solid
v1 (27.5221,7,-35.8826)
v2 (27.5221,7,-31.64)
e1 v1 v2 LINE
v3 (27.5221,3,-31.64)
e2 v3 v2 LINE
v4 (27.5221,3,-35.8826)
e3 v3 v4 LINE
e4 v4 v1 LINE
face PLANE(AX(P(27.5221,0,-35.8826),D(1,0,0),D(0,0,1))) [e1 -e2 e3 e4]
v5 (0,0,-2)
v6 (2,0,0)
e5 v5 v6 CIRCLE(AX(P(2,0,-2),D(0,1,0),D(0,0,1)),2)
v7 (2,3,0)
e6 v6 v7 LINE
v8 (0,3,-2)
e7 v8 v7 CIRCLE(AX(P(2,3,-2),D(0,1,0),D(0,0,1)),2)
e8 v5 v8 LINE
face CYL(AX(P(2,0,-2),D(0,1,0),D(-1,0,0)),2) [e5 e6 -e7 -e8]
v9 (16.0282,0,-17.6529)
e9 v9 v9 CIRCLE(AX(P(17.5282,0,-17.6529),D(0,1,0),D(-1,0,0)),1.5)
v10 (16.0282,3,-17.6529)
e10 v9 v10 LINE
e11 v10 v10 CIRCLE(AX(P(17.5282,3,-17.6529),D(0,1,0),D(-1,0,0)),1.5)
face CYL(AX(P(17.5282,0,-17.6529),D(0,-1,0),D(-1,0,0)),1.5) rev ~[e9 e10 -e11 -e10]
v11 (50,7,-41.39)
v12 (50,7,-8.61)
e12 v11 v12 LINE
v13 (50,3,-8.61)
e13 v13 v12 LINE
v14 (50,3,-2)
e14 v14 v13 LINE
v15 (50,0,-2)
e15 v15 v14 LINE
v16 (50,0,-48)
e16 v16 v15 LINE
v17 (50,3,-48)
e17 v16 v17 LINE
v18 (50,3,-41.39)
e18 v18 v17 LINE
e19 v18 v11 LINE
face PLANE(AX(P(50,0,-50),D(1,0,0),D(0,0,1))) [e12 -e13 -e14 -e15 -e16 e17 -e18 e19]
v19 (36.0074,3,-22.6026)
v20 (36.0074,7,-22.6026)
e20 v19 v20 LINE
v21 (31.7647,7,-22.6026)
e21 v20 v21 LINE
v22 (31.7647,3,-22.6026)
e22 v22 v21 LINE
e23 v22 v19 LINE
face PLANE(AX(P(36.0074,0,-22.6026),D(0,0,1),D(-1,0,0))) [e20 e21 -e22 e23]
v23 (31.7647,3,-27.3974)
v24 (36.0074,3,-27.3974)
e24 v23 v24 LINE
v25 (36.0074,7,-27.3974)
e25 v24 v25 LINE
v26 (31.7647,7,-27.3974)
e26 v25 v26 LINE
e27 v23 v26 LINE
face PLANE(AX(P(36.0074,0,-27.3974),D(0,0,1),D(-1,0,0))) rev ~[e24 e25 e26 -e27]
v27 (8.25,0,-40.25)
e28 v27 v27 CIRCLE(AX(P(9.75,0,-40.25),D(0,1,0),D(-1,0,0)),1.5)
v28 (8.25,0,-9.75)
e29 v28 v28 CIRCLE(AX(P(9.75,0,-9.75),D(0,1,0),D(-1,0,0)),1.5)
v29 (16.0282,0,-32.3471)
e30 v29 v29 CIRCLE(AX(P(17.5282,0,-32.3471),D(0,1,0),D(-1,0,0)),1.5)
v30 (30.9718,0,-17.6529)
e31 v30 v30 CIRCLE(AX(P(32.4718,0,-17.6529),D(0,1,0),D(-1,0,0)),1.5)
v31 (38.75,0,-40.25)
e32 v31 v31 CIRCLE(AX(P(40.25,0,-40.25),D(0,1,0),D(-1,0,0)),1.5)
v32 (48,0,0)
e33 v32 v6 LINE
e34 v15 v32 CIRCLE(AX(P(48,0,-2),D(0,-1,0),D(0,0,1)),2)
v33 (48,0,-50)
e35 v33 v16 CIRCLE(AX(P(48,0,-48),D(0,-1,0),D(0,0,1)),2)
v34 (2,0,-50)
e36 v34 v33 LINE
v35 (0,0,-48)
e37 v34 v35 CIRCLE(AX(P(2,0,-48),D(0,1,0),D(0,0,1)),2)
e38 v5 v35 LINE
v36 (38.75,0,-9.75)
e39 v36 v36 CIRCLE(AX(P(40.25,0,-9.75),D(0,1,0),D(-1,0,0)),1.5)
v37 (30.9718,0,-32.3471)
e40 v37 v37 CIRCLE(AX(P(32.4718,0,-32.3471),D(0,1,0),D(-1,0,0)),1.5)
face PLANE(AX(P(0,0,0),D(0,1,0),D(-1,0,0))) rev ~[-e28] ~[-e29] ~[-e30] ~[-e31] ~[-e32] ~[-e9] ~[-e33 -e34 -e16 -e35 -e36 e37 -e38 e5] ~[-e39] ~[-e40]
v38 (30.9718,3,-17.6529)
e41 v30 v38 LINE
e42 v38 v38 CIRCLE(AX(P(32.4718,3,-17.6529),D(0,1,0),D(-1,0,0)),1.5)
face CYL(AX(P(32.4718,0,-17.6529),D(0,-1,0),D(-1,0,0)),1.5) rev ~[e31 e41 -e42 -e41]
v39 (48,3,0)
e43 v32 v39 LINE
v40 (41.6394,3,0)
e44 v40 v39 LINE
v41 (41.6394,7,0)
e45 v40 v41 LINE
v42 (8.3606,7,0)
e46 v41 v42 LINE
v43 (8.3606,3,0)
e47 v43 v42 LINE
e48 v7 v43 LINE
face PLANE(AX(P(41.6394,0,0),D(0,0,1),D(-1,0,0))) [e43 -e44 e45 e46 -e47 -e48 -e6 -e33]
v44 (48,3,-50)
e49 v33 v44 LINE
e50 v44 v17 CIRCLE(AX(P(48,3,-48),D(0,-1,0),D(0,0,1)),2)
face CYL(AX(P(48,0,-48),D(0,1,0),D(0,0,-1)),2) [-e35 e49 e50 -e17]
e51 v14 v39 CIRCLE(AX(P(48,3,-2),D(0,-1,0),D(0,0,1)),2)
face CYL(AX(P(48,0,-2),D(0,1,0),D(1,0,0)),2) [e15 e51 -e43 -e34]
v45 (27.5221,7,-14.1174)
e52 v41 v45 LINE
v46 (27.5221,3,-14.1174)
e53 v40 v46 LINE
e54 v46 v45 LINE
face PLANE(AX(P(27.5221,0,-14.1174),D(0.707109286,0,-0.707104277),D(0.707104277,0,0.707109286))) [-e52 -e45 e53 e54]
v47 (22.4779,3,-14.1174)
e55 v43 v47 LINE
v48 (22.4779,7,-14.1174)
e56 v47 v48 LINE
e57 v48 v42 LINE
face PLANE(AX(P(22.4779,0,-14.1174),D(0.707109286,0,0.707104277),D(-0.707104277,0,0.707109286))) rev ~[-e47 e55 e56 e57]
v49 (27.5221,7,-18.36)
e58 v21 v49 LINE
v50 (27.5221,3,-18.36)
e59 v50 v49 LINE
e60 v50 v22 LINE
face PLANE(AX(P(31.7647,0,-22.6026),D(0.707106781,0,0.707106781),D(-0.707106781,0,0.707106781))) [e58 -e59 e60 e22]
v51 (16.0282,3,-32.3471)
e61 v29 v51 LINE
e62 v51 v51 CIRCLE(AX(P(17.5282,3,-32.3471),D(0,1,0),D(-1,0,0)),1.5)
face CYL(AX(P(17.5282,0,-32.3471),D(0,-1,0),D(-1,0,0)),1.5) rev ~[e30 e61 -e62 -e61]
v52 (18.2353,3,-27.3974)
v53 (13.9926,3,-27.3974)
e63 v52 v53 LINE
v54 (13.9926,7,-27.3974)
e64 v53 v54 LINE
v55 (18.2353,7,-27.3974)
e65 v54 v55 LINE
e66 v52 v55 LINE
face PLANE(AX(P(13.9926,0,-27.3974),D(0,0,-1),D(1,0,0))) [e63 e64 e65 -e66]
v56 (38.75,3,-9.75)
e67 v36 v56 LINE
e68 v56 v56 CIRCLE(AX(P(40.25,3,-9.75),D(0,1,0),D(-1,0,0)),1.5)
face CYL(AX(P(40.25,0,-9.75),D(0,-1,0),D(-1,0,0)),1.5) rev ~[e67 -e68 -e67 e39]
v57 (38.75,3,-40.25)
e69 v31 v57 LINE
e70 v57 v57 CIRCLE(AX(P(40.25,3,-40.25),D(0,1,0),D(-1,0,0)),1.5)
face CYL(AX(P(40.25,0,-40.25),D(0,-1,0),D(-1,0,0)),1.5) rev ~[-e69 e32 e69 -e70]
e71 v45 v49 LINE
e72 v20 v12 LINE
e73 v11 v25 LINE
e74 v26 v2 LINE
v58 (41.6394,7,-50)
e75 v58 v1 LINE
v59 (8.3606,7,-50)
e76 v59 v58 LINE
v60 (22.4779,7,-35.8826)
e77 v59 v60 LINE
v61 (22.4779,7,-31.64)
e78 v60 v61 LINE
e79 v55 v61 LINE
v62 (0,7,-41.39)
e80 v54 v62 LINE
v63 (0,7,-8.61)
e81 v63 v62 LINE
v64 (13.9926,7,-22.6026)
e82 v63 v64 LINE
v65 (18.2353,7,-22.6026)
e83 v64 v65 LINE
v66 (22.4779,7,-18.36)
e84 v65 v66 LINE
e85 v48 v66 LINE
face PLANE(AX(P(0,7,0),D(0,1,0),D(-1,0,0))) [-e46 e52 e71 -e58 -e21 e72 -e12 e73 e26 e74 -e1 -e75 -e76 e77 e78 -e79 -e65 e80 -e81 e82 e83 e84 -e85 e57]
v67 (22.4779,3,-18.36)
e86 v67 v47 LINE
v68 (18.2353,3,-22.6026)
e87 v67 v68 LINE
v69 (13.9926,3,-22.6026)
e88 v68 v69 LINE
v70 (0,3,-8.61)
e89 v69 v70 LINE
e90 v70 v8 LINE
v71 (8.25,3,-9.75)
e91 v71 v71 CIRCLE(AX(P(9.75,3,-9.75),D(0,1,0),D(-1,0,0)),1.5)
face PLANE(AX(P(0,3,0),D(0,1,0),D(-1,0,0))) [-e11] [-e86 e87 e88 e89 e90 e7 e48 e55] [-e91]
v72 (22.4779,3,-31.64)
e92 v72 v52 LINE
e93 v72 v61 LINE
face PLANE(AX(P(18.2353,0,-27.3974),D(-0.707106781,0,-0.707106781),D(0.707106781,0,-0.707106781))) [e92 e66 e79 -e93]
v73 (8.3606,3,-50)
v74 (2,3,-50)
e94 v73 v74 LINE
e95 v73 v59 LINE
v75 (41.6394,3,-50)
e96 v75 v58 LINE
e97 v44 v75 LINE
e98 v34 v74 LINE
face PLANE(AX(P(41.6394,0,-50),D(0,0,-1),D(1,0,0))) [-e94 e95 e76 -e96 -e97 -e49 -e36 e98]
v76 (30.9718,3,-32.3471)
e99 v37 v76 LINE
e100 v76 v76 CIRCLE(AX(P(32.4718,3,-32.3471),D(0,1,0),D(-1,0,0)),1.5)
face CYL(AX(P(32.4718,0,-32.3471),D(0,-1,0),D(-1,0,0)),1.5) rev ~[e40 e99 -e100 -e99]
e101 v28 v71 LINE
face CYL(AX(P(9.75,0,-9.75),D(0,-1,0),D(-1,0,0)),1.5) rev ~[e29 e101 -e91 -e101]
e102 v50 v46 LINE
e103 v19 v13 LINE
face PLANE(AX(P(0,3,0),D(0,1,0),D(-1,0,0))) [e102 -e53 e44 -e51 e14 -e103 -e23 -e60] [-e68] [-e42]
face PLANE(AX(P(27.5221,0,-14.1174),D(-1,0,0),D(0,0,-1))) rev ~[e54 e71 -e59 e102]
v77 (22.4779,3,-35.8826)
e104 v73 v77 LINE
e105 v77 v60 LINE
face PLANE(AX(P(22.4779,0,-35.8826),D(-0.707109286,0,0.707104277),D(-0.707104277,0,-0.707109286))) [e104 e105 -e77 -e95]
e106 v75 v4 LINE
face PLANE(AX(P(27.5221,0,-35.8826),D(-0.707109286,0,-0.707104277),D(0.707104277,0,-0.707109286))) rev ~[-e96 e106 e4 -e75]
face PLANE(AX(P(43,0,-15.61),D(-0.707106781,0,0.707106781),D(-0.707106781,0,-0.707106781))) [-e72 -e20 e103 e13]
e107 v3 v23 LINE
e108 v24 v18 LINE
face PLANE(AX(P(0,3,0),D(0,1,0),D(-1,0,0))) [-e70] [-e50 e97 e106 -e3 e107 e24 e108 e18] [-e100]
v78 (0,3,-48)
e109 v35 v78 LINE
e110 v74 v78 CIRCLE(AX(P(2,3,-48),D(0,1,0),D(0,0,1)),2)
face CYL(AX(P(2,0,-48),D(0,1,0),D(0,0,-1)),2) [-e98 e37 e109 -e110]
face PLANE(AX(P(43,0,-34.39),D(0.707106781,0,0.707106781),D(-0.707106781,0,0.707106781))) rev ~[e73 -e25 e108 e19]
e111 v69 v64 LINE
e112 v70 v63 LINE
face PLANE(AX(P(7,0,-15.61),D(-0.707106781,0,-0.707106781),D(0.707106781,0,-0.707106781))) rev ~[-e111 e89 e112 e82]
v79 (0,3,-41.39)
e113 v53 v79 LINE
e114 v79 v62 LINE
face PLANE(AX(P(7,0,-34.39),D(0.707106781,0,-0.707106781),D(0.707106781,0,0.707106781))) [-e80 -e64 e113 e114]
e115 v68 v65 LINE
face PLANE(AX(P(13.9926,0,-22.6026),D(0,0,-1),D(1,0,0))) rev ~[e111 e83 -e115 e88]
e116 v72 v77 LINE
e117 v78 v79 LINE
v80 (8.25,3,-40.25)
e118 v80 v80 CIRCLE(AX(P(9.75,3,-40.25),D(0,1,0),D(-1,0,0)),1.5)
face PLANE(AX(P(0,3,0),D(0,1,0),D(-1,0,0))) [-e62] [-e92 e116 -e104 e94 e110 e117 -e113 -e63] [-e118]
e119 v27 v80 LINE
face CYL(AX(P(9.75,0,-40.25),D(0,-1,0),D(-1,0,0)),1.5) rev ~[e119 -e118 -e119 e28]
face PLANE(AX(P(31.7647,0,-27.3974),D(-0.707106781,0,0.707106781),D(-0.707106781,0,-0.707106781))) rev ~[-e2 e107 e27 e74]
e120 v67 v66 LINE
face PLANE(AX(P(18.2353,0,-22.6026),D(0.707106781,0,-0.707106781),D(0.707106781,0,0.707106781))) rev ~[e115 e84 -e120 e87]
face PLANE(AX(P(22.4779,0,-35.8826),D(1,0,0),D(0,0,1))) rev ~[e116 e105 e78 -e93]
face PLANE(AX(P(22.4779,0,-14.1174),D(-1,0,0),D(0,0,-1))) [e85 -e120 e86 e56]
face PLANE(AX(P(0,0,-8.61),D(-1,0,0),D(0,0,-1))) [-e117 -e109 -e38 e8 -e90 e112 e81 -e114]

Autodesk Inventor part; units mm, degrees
ref_plane "YZ Plane" through (0, 0, 0) normal (1, 0, 0) x (0, 1, 0)
ref_plane "XZ Plane" through (0, 0, 0) normal (0, 1, 0) x (-1, 0, 0)
ref_plane "XY Plane" through (0, 0, 0) normal (0, 0, 1) x (1, 0, 0)
sketch "Grund" plane through (0, 0, 0) normal (0, 1, 0) x (-1, 0, 0)
  line L0 (-43, -43) -> (-7, -43)
  line L1 (-7, -43) -> (-7, -7)
  line L2 (-22.4779, -14.1174) -> (-8.3606, 0)
  line L3 (0, -8.61) -> (-13.9926, -22.6026)
  circle A0 centre (-32.4718, -17.6529) radius 1.5
  line L4 (-18.2353, -22.6026) -> (-22.4779, -18.36)
  line L5 (-22.4779, -14.1174) -> (-22.4779, -18.36)
  line L6 (-13.9926, -22.6026) -> (-18.2353, -22.6026)
  line L7 (-27.5221, -14.1174) -> (-27.5221, -18.36)
  line L8 (-31.7647, -22.6026) -> (-27.5221, -18.36)
  line L9 (-27.5221, -14.1174) -> (-41.6394, 0)
  line L10 (-36.0074, -22.6026) -> (-31.7647, -22.6026)
  line L11 (-50, -8.61) -> (-36.0074, -22.6026)
  line L12 (-27.5221, -35.8826) -> (-27.5221, -31.64)
  line L13 (-27.5221, -35.8826) -> (-41.6394, -50)
  line L14 (-36.0074, -27.3974) -> (-31.7647, -27.3974)
  line L15 (-31.7647, -27.3974) -> (-27.5221, -31.64)
  line L16 (-50, -41.39) -> (-36.0074, -27.3974)
  line L17 (-22.4779, -35.8826) -> (-22.4779, -31.64)
  line L18 (-22.4779, -35.8826) -> (-8.3606, -50)
  line L19 (-18.2353, -27.3974) -> (-22.4779, -31.64)
  line L20 (0, -41.39) -> (-13.9926, -27.3974)
  line L21 (-13.9926, -27.3974) -> (-18.2353, -27.3974)
  circle A1 centre (-32.4718, -32.3471) radius 1.5
  circle A2 centre (-40.25, -40.25) radius 1.5
  line L22 (-43, -7) -> (-43, -43)
  circle A3 centre (-17.5282, -17.6529) radius 1.5
  circle A4 centre (-17.5282, -32.3471) radius 1.5
  circle A5 centre (-9.75, -40.25) radius 1.5
  line L23 (-7, -7) -> (-43, -7)
  circle A6 centre (-9.75, -9.75) radius 1.5
  circle A7 centre (-40.25, -9.75) radius 1.5
  line L24 (0, 0) -> (0, -50)
  line L25 (0, -50) -> (-50, -50)
  line L26 (-50, -50) -> (-50, 0)
  line L27 (-50, 0) -> (0, 0)
  point P0 (-16.114, -25.276)
  point P1 (-24.5992, -33.7613)
  point P2 (-25.4008, -33.7613)
  point P3 (-33.886, -25.276)
  point P4 (-25.4008, -16.2387)
  point P5 (-33.886, -24.724)
  point P6 (-24.5992, -16.2387)
  point P7 (-16.114, -24.724)
  dimension "d0" = 36
  dimension "d1" = 36
  dimension "d4" = 3
  dimension "d5" = 3
  dimension "d6" = 3
  dimension "d7" = 3
  dimension "d9" = 50
  dimension "d10" = 50
extrude "Extrusion1" add sketch "Grund" along normal blind 3
extrude "Extrusion2" add sketch "Grund" along normal blind 7 contours L13 L12 L15 L14 L16 L22 L11 L10 L8 L7 L9 L23 L2 L5 L4 L6 L3 L1 L20 L21 L19 L17 L18 L0 | L0 L18 L25 L13 | L16 L26 L11 L22 | L1 L3 L24 L20 | L9 L27 L2 L23
fillet "Fillet1" radius 2 4 edges at (50, 1.5, -50) (50, 1.5, 0) (0, 1.5, 0) (0, 1.5, -50)
properties part number "Bot 2.1"
